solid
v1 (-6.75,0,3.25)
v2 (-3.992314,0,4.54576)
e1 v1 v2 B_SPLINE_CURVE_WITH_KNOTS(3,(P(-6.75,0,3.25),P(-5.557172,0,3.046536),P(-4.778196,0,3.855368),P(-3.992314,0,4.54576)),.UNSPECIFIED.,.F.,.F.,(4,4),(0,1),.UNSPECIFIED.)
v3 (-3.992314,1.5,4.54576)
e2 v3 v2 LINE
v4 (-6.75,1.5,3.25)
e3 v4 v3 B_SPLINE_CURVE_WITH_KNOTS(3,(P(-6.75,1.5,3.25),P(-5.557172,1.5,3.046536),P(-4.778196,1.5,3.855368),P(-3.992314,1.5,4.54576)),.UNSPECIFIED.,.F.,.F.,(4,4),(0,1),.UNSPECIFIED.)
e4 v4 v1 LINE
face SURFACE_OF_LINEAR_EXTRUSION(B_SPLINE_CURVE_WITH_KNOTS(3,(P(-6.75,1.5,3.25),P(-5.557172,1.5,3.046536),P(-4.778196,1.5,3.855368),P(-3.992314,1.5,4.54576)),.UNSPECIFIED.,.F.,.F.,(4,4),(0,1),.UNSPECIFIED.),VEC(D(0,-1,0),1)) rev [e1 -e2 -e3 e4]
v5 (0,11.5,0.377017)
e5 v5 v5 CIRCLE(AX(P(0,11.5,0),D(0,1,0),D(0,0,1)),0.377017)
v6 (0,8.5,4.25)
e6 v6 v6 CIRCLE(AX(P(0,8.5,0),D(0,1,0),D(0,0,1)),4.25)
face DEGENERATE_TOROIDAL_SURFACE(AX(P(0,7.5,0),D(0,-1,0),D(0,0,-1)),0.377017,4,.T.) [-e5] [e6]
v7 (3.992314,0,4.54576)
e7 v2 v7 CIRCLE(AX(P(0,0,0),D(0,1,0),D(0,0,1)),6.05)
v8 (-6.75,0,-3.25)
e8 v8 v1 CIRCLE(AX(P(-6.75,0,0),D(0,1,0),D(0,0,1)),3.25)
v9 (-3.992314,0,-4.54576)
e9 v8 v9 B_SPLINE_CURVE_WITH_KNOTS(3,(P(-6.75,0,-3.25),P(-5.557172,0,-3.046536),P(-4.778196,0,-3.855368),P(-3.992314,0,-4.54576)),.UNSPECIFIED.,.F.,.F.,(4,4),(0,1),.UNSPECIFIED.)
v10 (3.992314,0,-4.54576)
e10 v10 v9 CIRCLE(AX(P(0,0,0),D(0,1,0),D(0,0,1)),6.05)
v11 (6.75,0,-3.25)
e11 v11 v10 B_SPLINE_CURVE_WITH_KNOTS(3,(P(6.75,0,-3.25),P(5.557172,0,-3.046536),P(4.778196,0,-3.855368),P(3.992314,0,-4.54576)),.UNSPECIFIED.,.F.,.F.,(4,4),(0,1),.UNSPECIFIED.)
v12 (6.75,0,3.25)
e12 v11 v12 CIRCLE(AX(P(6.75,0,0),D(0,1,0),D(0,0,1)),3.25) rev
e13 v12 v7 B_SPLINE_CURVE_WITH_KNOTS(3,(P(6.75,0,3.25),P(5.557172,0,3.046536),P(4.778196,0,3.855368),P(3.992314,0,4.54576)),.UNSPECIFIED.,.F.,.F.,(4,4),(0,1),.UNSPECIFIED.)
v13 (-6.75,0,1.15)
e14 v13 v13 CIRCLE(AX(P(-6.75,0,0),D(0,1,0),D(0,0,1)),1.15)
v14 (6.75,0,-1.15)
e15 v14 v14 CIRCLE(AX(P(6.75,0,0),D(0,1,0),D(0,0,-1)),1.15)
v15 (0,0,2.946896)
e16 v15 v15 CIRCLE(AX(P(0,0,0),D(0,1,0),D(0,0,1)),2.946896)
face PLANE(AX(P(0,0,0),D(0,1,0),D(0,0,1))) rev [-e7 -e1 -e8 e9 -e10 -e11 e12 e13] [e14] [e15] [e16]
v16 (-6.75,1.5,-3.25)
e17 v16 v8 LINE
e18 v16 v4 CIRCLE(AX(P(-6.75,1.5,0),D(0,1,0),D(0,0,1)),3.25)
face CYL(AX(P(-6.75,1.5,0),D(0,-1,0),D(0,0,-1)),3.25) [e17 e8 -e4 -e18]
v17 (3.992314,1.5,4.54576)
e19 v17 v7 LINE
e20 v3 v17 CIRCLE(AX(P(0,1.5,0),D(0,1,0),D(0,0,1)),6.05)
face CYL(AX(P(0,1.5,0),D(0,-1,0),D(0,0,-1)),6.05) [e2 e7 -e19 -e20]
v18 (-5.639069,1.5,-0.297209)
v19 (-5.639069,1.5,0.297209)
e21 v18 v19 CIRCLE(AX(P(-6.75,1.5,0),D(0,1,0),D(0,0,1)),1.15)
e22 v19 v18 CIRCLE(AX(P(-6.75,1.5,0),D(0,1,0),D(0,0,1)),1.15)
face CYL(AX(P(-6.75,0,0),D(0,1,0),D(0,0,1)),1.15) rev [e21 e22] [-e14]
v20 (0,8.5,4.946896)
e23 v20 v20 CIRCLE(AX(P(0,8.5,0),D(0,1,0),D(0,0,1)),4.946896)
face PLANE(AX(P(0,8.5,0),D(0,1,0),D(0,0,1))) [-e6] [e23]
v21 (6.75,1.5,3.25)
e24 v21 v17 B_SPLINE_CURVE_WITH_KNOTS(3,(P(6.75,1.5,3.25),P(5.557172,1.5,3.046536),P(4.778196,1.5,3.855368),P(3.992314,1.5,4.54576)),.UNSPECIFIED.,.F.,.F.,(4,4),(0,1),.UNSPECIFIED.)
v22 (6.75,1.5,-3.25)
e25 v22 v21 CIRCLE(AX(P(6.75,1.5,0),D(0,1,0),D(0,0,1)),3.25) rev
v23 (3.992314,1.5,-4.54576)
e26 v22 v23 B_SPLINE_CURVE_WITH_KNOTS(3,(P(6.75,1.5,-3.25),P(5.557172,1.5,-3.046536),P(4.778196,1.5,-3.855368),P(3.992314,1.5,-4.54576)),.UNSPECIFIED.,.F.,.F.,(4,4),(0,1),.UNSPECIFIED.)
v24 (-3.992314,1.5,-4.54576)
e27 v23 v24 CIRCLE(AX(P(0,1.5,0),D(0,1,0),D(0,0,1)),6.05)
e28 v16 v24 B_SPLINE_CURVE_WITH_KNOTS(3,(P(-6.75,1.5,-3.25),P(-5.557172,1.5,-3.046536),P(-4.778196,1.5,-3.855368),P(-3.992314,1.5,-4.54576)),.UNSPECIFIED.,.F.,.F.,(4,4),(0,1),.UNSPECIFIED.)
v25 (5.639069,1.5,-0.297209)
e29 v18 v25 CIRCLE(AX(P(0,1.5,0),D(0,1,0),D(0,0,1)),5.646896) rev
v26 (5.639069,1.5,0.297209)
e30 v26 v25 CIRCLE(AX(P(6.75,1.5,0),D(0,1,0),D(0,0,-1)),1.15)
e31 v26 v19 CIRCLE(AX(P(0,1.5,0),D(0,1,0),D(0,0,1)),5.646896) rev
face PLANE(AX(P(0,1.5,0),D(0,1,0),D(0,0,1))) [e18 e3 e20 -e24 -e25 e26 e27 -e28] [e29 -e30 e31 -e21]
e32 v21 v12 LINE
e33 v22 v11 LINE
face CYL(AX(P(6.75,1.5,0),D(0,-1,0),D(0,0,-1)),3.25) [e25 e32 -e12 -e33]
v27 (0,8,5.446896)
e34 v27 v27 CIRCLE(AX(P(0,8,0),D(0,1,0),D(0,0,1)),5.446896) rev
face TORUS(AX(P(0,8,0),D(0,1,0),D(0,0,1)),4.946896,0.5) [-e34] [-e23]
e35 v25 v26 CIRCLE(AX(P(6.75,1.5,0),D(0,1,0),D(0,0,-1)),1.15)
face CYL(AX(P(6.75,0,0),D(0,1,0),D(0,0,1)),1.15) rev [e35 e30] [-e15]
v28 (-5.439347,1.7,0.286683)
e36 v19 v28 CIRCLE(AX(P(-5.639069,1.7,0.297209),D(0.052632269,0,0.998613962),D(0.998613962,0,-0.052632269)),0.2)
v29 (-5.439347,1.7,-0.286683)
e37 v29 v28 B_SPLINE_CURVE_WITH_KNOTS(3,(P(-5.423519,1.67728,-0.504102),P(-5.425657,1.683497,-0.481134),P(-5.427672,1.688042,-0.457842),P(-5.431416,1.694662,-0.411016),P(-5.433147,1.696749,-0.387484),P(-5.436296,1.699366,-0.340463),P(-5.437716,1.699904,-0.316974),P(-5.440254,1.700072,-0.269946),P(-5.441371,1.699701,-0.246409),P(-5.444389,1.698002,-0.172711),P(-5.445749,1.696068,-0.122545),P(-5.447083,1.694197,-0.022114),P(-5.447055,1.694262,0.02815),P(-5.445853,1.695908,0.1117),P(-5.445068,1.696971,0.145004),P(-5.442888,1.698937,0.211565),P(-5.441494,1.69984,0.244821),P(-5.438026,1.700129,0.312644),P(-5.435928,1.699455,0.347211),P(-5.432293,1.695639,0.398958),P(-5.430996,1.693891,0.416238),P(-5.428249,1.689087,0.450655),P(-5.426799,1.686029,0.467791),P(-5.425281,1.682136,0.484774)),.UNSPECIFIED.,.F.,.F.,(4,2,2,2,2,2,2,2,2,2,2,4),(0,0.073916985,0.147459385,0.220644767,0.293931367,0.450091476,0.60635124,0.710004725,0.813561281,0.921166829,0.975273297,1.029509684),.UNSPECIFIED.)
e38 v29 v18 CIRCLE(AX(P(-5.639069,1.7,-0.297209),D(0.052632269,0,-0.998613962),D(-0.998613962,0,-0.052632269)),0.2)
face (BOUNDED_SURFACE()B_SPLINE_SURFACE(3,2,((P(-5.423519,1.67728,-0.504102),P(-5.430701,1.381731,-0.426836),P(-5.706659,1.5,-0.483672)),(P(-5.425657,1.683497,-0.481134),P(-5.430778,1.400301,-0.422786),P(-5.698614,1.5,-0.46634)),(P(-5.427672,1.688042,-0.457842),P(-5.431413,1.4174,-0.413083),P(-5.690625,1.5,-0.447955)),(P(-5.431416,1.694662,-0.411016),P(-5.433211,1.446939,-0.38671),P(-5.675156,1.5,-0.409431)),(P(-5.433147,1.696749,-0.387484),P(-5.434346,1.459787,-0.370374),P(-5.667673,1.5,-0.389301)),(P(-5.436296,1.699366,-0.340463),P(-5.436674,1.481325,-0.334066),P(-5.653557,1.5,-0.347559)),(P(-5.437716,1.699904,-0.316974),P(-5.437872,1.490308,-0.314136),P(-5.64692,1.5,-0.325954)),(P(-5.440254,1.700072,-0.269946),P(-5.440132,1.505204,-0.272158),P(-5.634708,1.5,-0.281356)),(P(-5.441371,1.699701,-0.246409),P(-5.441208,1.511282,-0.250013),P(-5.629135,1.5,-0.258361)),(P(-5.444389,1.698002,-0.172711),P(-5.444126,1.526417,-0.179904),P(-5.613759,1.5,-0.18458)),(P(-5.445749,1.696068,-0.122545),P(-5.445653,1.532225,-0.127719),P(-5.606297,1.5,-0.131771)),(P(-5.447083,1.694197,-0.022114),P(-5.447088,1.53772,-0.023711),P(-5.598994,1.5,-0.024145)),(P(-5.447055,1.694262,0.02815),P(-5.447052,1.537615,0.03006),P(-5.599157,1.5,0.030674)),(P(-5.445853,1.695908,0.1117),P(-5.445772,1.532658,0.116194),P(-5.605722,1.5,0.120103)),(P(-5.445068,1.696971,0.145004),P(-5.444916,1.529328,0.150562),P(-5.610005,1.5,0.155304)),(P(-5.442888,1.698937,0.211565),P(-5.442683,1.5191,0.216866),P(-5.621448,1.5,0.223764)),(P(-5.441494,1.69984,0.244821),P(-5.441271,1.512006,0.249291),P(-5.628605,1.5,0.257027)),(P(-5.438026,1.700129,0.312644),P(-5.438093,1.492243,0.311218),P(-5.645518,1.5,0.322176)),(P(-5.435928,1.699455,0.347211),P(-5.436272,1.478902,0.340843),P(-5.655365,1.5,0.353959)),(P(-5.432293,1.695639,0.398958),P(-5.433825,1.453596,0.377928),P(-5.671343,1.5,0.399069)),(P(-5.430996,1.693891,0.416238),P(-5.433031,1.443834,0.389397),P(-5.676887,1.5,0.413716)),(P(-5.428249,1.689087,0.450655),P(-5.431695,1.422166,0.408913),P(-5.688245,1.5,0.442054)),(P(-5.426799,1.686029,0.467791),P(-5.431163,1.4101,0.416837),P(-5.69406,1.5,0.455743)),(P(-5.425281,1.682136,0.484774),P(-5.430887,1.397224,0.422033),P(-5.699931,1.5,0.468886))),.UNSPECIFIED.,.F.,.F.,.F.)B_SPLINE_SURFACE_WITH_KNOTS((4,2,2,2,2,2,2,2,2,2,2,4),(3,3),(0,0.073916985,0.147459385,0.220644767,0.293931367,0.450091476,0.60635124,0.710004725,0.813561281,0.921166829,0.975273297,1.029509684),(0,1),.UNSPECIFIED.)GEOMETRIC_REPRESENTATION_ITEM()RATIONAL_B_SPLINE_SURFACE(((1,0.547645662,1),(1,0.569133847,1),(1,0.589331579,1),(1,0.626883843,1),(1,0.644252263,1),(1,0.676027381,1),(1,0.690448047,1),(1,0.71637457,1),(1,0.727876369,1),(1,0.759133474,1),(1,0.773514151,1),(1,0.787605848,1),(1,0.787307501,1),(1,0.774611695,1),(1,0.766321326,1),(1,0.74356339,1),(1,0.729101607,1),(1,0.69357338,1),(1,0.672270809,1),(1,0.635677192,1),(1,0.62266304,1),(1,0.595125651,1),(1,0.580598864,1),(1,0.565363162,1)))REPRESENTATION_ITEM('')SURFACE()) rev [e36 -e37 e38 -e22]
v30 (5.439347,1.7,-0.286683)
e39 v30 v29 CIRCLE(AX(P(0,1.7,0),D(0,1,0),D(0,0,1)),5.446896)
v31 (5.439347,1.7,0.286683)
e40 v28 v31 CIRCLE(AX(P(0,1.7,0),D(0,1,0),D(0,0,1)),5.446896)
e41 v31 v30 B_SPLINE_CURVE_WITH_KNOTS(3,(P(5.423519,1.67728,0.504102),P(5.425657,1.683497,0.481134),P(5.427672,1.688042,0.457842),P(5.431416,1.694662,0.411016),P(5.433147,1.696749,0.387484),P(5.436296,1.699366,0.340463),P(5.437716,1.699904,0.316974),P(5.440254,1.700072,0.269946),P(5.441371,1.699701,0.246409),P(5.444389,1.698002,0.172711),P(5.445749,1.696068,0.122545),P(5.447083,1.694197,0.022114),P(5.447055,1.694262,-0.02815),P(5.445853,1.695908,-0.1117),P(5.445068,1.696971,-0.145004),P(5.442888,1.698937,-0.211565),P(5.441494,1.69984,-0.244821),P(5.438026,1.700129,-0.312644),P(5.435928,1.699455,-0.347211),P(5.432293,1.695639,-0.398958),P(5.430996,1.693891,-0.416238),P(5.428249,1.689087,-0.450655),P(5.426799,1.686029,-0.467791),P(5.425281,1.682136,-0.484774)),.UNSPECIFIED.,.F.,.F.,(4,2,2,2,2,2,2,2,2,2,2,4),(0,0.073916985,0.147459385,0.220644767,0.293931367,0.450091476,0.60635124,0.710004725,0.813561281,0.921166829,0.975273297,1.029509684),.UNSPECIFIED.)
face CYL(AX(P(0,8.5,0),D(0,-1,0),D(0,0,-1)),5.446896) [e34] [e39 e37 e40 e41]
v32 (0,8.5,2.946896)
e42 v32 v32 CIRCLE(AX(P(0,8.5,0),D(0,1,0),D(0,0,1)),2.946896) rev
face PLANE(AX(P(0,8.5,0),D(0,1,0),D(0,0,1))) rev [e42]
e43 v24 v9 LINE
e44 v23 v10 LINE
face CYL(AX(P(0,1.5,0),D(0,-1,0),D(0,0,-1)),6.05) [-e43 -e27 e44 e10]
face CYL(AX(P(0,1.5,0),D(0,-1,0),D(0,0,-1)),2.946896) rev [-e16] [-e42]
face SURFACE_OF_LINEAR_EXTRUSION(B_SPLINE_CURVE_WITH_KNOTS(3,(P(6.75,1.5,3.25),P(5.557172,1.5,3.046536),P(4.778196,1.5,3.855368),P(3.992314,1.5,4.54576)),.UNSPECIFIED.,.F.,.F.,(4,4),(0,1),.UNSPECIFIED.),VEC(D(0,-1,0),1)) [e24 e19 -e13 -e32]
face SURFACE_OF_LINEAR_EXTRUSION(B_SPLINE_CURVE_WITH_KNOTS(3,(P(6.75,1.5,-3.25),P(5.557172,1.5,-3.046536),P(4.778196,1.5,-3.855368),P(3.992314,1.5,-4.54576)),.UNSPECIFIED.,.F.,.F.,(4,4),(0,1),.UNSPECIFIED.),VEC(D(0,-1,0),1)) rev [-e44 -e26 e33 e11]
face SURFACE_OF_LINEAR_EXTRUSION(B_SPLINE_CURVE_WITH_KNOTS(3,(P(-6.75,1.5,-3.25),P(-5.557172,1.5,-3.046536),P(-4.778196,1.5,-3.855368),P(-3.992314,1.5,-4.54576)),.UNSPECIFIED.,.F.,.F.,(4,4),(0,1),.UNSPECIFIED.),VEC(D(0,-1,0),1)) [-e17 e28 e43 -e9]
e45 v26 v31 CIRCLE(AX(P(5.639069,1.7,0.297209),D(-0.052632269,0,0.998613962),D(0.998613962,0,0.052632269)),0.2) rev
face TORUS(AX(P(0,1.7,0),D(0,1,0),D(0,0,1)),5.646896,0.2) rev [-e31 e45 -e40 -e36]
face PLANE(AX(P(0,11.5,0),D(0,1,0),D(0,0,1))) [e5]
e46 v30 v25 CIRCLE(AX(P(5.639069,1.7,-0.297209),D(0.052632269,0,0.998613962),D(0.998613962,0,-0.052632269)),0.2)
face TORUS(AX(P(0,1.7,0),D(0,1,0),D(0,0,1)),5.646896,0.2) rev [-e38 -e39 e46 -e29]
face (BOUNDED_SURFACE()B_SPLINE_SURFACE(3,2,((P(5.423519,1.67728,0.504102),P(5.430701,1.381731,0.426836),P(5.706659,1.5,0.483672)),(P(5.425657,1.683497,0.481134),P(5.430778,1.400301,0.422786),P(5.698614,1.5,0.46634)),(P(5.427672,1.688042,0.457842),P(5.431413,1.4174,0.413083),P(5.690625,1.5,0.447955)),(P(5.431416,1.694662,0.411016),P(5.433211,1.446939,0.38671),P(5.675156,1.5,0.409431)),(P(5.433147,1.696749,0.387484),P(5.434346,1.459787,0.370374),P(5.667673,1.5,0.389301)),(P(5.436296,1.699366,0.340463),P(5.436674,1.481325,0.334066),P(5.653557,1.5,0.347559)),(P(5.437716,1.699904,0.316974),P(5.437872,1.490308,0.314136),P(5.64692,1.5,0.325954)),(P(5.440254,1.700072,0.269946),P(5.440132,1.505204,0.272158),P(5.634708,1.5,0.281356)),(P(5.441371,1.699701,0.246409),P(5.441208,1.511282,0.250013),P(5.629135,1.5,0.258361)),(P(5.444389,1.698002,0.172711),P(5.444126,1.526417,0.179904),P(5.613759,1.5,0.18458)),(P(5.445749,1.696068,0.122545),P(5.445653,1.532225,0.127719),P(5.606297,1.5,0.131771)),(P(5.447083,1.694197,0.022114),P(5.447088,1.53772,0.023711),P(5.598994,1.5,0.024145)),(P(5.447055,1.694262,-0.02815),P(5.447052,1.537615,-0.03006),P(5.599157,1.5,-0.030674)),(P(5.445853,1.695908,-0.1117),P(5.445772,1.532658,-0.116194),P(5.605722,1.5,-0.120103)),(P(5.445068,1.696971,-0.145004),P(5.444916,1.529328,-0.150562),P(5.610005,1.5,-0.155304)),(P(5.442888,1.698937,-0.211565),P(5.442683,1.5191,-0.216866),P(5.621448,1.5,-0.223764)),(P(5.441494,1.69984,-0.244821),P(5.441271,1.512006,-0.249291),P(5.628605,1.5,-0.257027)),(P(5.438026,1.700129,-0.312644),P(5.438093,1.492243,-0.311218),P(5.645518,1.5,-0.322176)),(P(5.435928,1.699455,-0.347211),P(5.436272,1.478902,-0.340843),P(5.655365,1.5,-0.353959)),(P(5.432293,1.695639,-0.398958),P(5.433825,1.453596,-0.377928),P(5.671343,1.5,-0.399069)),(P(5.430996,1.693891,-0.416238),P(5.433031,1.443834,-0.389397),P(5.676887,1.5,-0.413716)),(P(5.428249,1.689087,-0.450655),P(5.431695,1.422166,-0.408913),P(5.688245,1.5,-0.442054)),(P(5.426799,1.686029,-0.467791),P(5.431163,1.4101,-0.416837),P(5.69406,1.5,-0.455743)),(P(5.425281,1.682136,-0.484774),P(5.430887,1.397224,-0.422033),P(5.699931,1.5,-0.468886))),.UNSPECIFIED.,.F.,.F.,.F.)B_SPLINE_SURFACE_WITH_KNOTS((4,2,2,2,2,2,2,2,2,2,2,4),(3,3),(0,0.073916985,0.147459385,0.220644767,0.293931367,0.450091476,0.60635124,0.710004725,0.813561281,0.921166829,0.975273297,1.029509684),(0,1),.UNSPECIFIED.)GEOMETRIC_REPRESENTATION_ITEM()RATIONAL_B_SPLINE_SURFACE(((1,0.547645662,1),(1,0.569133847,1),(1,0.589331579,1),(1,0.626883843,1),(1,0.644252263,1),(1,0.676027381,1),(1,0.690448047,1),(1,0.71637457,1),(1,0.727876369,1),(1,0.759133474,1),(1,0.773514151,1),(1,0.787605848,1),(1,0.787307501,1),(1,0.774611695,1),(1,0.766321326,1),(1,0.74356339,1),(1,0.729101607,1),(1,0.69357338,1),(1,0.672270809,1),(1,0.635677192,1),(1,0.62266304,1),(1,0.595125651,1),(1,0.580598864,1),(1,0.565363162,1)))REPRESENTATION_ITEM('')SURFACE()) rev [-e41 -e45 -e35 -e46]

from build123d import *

# Parameters (mm, degrees)
BOSS_EXTRUDE1_OUTLINE_R = 2.946896199
BOSS_EXTRUDE1_DEPTH     = 1.5
SKETCH2_R               = 1.15
CUT_EXTRUDE1_DEPTH      = 12.783569218
SKETCH3_R               = 5.446896199
SKETCH3_R_2             = 2.946896199
BOSS_EXTRUDE2_DEPTH     = 7
SKETCH4_R               = 4.25
BOSS_EXTRUDE3_DEPTH     = 3
FILLET1_R               = 4
FILLET2_R               = 0.5
FILLET3_R               = 0.2


# Read off the part's stored shape, not the designer's step: Boss-Extrude1
with BuildPart() as part:
    # Boss-Extrude1 outline → Boss-Extrude1 (new body)
    with BuildSketch(Plane(origin=(0, 0, 0), x_dir=(1, 0, 0), z_dir=(0, 1, 0))):
        with BuildLine():
            ThreePointArc((-6.75, 3.25), (-10, 0), (-6.75, -3.25))
            add(Edge.make_bspline(
                [(-6.75, -3.25), (-5.557172284, -3.046535522), (-4.778196117, -3.855368441), (-3.992313535, -4.545759853)],
                knots=[0, 0, 0, 0, 1, 1, 1, 1], degree=3))
            ThreePointArc((-3.992313535, -4.545759853), (0, -6.05), (3.992313535, -4.545759853))
            add(Edge.make_bspline(
                [(6.75, -3.25), (5.557172284, -3.046535522), (4.778196117, -3.855368441), (3.992313535, -4.545759853)],
                knots=[0, 0, 0, 0, 1, 1, 1, 1], degree=3))
            ThreePointArc((6.75, -3.25), (10, 0), (6.75, 3.25))
            add(Edge.make_bspline(
                [(6.75, 3.25), (5.557172284, 3.046535522), (4.778196117, 3.855368441), (3.992313535, 4.545759853)],
                knots=[0, 0, 0, 0, 1, 1, 1, 1], degree=3))
            ThreePointArc((3.992313535, 4.545759853), (0, 6.05), (-3.992313535, 4.545759853))
            add(Edge.make_bspline(
                [(-6.75, 3.25), (-5.557172284, 3.046535522), (-4.778196117, 3.855368441), (-3.992313535, 4.545759853)],
                knots=[0, 0, 0, 0, 1, 1, 1, 1], degree=3))
        make_face()
        Circle(BOSS_EXTRUDE1_OUTLINE_R, mode=Mode.SUBTRACT)
    extrude(amount=BOSS_EXTRUDE1_DEPTH)

    # Sketch2 → Cut-Extrude1 (cut, through all)
    with BuildSketch(Plane(origin=(0, 1.5, 0), x_dir=(1, 0, 0), z_dir=(0, 1, 0))):
        with Locations(Location((-6.75, 0, 0), (0, 0, 270))):
            Circle(SKETCH2_R)
        with Locations(Location((6.75, 0, 0), (0, 0, 90))):
            Circle(SKETCH2_R)
    extrude(amount=-CUT_EXTRUDE1_DEPTH, mode=Mode.SUBTRACT)

    # Sketch3 → Boss-Extrude2 (add)
    with BuildSketch(Plane(origin=(0, 1.5, 0), x_dir=(1, 0, 0), z_dir=(0, 1, 0))):
        with Locations(Location((0, 0, 0), (0, 0, 270))):
            Circle(SKETCH3_R)
        with Locations(Location((0, 0, 0), (0, 0, 270))):
            Circle(SKETCH3_R_2, mode=Mode.SUBTRACT)
    extrude(amount=BOSS_EXTRUDE2_DEPTH)

    # Sketch4 → Boss-Extrude3 (add)
    with BuildSketch(Plane(origin=(0, 8.5, 0), x_dir=(1, 0, 0), z_dir=(0, 1, 0))):
        with Locations(Location((0, 0, 0), (0, 0, 270))):
            Circle(SKETCH4_R)
    extrude(amount=BOSS_EXTRUDE3_DEPTH)

    # Fillet1
    # the kernel refuses this fillet: 4 mm, written as the material it takes off along each edge
    with BuildSketch(Plane(origin=(0, 11.5, 0), x_dir=(0, 0, 1), z_dir=(-1, 0, 0))) as fillet1_piece_1:
        with BuildLine():
            CenterArc((0.377016654, -4), FILLET1_R, 14.477512186, 75.522487814)
            Line((0.377016654, 0), (0.377016654, 0.08))
            Line((0.377016654, 0.08), (4.25, 0.08))
            Line((4.25, 0.08), (4.33, 0))
            ThreePointArc((4.33, 0), (4.33, -1.5), (4.327459667, -2.98))
            Line((4.327459667, -2.98), (4.25, -3))
        make_face()
    revolve(axis=Axis((0, 11.5, 0), (0, 1, 0)), mode=Mode.SUBTRACT)

    # Fillet2
    fillet2_edges = [part.edges().sort_by_distance(p)[0] for p in [
        (0, 8.5, -5.446896199),
    ]]
    fillet(fillet2_edges, radius=FILLET2_R)

    # Fillet3
    fillet3_edges = [part.edges().sort_by_distance(p)[0] for p in [
        (0, 1.5, -5.446896199),
    ]]
    fillet(fillet3_edges, radius=FILLET3_R)


solid = part.part
